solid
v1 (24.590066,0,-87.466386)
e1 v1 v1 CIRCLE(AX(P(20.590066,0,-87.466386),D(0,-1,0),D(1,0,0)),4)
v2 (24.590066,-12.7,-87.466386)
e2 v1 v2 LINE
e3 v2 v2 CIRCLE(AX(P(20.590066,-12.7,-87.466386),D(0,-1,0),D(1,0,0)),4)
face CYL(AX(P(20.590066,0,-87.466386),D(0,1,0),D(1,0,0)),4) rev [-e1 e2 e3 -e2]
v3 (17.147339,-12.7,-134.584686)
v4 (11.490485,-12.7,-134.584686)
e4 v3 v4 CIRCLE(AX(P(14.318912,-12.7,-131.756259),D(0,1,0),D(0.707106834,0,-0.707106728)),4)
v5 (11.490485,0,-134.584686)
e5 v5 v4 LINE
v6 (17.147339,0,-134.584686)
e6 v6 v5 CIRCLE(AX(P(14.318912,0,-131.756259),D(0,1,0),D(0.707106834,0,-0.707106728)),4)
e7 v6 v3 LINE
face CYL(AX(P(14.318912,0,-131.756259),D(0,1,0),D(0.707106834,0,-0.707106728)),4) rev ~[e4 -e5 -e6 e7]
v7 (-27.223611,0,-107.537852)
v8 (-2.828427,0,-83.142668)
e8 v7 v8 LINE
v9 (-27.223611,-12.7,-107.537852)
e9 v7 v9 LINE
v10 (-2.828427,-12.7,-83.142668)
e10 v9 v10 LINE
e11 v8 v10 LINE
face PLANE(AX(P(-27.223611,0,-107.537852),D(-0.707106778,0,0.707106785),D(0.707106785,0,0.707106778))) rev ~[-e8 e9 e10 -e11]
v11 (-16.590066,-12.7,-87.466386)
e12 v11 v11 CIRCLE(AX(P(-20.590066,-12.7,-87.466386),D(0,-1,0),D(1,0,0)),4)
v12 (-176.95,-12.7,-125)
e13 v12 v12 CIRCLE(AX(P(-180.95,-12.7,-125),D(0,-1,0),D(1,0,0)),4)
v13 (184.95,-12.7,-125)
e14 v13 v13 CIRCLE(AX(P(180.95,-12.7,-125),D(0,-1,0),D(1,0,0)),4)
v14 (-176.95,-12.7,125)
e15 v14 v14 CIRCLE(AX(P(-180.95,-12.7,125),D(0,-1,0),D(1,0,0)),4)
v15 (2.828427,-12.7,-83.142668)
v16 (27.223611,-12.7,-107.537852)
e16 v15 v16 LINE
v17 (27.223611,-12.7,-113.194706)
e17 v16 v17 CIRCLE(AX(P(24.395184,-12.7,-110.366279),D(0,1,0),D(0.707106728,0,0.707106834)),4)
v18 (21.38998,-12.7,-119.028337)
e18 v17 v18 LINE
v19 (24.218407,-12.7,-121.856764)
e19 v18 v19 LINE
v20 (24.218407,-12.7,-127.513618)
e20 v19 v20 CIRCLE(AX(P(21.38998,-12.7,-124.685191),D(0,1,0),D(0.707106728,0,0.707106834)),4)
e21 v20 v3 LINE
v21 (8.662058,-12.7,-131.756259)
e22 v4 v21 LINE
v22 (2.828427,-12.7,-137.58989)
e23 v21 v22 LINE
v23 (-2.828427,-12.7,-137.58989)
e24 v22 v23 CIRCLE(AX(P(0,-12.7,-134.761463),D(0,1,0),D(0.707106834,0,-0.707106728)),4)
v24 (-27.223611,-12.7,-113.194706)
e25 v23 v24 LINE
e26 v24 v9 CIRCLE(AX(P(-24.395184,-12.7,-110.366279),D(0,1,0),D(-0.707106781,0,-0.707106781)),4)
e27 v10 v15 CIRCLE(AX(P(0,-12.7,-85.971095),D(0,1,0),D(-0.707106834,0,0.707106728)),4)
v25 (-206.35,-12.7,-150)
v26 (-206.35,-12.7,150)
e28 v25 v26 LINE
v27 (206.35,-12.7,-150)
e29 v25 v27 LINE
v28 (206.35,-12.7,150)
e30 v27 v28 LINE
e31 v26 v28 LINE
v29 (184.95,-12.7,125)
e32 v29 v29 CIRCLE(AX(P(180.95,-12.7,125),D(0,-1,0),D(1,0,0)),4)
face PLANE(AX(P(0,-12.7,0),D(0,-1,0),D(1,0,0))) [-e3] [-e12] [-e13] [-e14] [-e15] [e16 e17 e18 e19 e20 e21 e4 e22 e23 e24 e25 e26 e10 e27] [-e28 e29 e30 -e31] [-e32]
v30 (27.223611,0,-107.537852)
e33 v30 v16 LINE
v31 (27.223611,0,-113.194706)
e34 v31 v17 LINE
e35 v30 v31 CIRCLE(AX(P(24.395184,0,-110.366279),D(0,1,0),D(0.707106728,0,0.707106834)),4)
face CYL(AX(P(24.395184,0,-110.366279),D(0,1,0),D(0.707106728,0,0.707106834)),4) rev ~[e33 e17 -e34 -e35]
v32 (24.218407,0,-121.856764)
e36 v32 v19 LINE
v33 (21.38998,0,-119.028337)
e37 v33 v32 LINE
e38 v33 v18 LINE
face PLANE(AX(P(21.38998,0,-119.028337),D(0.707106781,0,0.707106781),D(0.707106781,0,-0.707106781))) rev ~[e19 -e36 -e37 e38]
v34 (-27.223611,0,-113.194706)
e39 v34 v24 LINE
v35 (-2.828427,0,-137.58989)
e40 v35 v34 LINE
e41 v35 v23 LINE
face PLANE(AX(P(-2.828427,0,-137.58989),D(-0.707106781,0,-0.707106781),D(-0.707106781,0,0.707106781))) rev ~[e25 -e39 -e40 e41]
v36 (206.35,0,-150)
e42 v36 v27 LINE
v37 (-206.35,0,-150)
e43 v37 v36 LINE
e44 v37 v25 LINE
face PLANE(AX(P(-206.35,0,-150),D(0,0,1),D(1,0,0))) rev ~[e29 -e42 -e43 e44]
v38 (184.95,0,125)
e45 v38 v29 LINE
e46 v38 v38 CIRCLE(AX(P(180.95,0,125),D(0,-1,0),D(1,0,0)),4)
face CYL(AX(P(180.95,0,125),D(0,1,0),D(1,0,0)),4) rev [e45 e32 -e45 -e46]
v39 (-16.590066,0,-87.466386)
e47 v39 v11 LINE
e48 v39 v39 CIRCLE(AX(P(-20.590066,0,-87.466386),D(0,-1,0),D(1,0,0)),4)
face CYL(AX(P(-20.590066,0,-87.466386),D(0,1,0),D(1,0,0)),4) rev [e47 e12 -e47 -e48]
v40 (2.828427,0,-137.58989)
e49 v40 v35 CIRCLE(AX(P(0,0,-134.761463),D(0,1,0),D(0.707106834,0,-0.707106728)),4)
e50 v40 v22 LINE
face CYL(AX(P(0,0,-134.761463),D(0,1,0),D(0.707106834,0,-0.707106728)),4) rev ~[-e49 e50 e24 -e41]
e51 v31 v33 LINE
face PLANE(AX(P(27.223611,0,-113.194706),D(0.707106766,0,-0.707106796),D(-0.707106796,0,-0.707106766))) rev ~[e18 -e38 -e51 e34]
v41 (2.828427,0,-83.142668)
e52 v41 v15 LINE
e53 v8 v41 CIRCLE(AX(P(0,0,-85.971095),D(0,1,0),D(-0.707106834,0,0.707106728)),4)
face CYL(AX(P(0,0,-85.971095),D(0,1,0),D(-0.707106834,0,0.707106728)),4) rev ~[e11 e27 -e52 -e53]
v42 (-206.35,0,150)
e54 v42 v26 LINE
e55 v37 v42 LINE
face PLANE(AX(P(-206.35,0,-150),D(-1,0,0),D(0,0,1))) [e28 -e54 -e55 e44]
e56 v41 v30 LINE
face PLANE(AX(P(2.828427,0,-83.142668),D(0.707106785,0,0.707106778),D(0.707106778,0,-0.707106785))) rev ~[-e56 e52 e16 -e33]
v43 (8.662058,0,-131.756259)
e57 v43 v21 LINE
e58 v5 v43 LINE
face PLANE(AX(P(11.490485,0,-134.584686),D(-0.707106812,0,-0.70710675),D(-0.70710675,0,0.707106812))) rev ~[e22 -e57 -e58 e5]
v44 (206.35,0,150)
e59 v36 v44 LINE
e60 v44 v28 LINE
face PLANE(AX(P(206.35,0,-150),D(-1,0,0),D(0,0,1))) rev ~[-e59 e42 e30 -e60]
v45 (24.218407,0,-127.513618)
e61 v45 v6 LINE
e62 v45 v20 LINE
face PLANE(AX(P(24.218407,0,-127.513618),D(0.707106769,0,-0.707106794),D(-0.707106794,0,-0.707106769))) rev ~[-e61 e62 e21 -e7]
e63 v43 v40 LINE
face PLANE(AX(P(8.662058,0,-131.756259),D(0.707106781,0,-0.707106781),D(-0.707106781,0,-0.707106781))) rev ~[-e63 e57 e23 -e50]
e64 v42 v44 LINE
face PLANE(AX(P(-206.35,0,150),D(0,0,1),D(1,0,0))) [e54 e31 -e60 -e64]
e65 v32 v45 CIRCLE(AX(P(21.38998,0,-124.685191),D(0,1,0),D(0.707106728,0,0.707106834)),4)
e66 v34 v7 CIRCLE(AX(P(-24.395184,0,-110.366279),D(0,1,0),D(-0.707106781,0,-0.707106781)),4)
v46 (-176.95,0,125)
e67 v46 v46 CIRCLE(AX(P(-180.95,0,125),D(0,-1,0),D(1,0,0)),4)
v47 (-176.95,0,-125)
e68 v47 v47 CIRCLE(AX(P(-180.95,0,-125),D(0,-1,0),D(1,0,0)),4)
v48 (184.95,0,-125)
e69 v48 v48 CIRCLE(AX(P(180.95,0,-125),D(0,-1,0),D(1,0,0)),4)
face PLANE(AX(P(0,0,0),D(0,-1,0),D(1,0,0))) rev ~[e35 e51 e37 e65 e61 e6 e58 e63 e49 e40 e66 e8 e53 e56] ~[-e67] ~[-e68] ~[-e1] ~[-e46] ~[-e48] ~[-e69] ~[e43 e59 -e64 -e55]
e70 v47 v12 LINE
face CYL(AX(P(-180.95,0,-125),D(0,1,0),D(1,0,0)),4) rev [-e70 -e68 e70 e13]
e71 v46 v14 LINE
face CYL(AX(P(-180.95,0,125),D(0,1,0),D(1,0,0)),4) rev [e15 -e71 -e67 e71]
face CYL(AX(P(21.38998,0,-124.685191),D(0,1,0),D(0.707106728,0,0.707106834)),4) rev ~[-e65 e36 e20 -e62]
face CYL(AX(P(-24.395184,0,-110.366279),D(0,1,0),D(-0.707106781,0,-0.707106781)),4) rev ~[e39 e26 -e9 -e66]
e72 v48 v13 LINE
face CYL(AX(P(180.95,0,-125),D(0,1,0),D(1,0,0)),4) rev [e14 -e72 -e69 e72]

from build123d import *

# Parameters (mm, degrees)
F0_W     = 412.7
F0_H     = 300
F0_R     = 4
F1_DEPTH = 12.7


# Not quite as in the source:
# - ends of sketch curves that miss each other by under 0.0002 mm in the source are joined
# - a length typed as a fraction of an inch, garbled in the dataset ("3 / 203.2 mm" for 3/8 in), is restored


with BuildPart() as f1:
    # F0 (on Front) → F1 (new body)
    with BuildSketch(Plane.XZ):
        Rectangle(F0_W, F0_H)
        with Locations((-180.95, -125)):
            Circle(F0_R, mode=Mode.SUBTRACT)
        with BuildLine():
            ThreePointArc((-27.2236111247, -113.1947061247), (-28.395184, -110.366279), (-27.2236111247, -107.5378518753))
            Line((-27.2236111247, -107.5378518753), (-2.828427, -83.142668))
            ThreePointArc((-2.828427, -83.142668), (0, -81.971095), (2.8284271247, -83.1426678753))
            Line((2.8284271247, -83.1426678753), (27.223611, -107.537852))
            ThreePointArc((27.223611, -107.537852), (28.395184, -110.366279), (27.2236111247, -113.1947061247))
            Line((27.2236111247, -113.1947061247), (21.38998, -119.028337))
            Line((21.38998, -119.028337), (24.218407, -121.856764))
            ThreePointArc((24.218407, -121.856764), (25.38998, -124.685191), (24.2184071247, -127.5136181247))
            Line((24.2184071247, -127.5136181247), (17.147339, -134.584686))
            ThreePointArc((17.147339, -134.584686), (14.318912, -135.756259), (11.4904848753, -134.5846861247))
            Line((11.4904848753, -134.5846861247), (8.662058, -131.756259))
            Line((8.662058, -131.756259), (2.828427, -137.58989))
            ThreePointArc((2.828427, -137.58989), (0, -138.761463), (-2.8284271247, -137.5898901247))
            Line((-2.8284271247, -137.5898901247), (-27.2236111247, -113.1947061247))
        make_face(mode=Mode.SUBTRACT)
        with Locations((-20.590066, -87.466386)):
            Circle(F0_R, mode=Mode.SUBTRACT)
        with Locations((20.590066, -87.466386)):
            Circle(F0_R, mode=Mode.SUBTRACT)
        with Locations((180.95, -125)):
            Circle(F0_R, mode=Mode.SUBTRACT)
        with Locations((-180.95, 125)):
            Circle(F0_R, mode=Mode.SUBTRACT)
        with Locations((180.95, 125)):
            Circle(F0_R, mode=Mode.SUBTRACT)
    extrude(amount=F1_DEPTH)


solid = f1.part
